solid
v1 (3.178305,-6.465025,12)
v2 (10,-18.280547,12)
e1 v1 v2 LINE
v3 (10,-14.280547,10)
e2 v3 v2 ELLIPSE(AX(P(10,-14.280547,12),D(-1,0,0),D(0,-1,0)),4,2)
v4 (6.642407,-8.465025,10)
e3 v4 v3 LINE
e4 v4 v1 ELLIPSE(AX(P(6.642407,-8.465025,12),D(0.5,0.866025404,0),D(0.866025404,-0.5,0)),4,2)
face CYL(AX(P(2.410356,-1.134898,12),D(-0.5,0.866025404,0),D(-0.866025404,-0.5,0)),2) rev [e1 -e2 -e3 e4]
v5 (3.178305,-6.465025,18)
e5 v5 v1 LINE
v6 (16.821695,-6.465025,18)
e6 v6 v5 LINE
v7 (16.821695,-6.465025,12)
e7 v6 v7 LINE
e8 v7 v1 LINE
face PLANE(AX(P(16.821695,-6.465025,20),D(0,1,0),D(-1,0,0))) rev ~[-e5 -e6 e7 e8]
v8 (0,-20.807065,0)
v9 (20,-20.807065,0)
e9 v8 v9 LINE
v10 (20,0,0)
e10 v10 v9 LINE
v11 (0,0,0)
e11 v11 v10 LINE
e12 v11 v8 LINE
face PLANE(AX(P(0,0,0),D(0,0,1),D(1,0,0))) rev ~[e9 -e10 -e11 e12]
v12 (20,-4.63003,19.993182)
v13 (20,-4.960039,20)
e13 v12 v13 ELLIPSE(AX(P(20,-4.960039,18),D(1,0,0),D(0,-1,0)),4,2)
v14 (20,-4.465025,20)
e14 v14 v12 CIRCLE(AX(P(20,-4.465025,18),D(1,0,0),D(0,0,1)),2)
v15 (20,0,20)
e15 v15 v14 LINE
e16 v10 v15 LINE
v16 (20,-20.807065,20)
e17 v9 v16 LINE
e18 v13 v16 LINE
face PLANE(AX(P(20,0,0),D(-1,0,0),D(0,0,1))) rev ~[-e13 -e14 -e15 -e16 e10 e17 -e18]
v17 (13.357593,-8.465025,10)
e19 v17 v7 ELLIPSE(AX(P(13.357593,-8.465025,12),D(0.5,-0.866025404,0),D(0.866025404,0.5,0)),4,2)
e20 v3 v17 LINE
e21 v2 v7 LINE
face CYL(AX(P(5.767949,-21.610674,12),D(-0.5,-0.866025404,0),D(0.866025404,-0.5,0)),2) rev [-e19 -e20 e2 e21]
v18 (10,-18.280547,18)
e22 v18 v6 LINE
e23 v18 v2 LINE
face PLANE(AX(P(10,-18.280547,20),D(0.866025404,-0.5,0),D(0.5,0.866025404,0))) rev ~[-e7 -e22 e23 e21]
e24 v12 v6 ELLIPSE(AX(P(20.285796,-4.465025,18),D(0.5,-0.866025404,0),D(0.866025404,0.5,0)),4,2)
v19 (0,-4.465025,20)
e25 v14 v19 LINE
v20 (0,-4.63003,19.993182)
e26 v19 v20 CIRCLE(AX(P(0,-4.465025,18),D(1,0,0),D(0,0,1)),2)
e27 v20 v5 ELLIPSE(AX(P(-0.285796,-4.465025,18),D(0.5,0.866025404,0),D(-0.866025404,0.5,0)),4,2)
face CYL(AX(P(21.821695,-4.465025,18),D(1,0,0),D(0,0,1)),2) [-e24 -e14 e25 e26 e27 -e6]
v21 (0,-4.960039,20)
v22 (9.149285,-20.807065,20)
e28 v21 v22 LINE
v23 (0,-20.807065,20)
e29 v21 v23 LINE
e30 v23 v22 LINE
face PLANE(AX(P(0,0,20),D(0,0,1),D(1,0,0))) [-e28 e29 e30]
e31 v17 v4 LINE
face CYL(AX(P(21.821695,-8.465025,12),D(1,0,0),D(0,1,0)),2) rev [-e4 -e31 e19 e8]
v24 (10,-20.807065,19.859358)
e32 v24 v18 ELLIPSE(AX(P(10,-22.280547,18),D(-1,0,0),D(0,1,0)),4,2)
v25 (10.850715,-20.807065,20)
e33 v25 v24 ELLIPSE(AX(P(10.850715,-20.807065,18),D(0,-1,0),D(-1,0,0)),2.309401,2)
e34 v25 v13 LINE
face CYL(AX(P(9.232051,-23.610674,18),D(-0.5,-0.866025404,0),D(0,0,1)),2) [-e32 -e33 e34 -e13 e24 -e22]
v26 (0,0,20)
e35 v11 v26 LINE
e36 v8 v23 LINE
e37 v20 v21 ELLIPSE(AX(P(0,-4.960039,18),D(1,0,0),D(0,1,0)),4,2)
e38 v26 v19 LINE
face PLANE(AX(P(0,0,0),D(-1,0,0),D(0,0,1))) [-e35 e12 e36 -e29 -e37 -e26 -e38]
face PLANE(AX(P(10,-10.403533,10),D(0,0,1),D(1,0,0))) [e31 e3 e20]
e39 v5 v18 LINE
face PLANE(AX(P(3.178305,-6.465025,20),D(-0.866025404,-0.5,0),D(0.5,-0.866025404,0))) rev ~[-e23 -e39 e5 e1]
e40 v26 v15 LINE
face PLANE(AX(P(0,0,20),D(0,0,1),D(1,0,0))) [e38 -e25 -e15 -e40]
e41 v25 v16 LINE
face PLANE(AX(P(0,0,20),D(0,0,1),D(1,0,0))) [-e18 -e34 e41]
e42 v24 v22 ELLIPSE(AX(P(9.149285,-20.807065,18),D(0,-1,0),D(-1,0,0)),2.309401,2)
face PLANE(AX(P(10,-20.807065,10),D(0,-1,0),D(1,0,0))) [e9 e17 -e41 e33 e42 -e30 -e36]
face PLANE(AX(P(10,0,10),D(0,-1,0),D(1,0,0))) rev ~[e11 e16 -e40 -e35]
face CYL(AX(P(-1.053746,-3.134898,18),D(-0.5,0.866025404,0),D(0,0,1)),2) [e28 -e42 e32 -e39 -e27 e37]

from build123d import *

# Parameters (mm, degrees)
F0_W         = 20
F0_H         = 20
F1_DEPTH     = 20.8070650697
F3_DEPTH     = 10
F4_T4_DEPTH  = 23.6433897602
F4_T10_DEPTH = 23.6433897602
F4_T15_DEPTH = 23.6433897602
F4_T20_DEPTH = 23.6433897602
F4_T26_DEPTH = 23.6433897602
F4_T32_DEPTH = 23.6433897602
F4_T39_DEPTH = 23.6433897602
F4_T44_DEPTH = 23.6433897602
F4_T52_DEPTH = 23.6433897602
F4_T57_DEPTH = 23.6433897602
F4_T65_DEPTH = 23.6433897602
F4_T70_DEPTH = 23.6433897602


# Not quite as in the source:
# - a fillet or chamfer that OpenCascade refuses, or shapes differently, is made with other operations: its cross-section is extruded or revolved along the edge and cut away or added


with BuildPart() as f1:
    # F0 (on Front) → F1 (new body)
    with BuildSketch(Plane.XZ):
        with Locations((10, 10)):
            Rectangle(F0_W, F0_H)
    extrude(amount=F1_DEPTH)

    # F2 (on face) → F3 (cut)
    with BuildSketch(Plane.XY.offset(20)):
        Polygon((10, -18.2805472855), (16.8216948801, -6.4650251595), (3.1783051199, -6.4650251595), align=None)
    extrude(amount=-F3_DEPTH, mode=Mode.SUBTRACT)

    # F4: fillet of radius 2 on 6 edges, made by hand


with BuildPart() as f4_tool2:
    # F4_s3 → F4_t4 (new body)
    with BuildSketch(Plane.YZ.offset(21.8216948801)):
        with BuildLine():
            ThreePointArc((-6.4650251595, 12), (-7.0508115971, 10.5857864376), (-8.4650251595, 10))
            Line((-8.4650251595, 10), (-6.4650251595, 10))
            Line((-6.4650251595, 10), (-6.4650251595, 12))
        make_face()
    extrude(amount=-F4_T4_DEPTH)

    split(bisect_by=Plane(origin=(-0.4157091722, -0.2400098025, 0), x_dir=(0, 0, 1), z_dir=(0.8660254038, 0.5, 0)), keep=Keep.TOP)

    split(bisect_by=Plane(origin=(15.4157091722, -8.9002638403, 0), x_dir=(0, 0, 1), z_dir=(-0.8660254038, 0.5, 0)), keep=Keep.TOP)


with BuildPart() as f1_1:
    add(f1.part)

    # F4_t1: union F4_tool2
    add(f4_tool2.part)


with BuildPart() as f4_tool8:
    # F4_s9 → F4_t10 (new body)
    with BuildSketch(Plane(origin=(-7.9157091722, -13.7104104641, 0), x_dir=(0, 0, 1), z_dir=(0.5, 0.8660254038, 0))):
        with BuildLine():
            ThreePointArc((12, 17.8005276806), (10.5857864376, 17.214741243), (10, 15.8005276806))
            Line((10, 15.8005276806), (10, 17.8005276806))
            Line((10, 17.8005276806), (12, 17.8005276806))
        make_face()
    extrude(amount=F4_T10_DEPTH)

    split(bisect_by=Plane(origin=(-0.4157091722, -0.2400098025, 0), x_dir=(0, 0, 1), z_dir=(0.8660254038, 0.5, 0)), keep=Keep.TOP)


with BuildPart() as f1_2:
    add(f1_1.part)

    # F4_t7: union F4_tool8
    add(f4_tool8.part)


with BuildPart() as f4_tool13:
    # F4_s14 → F4_t15 (new body)
    with BuildSketch(Plane(origin=(1.0940142921, -1.8948883381, 0), x_dir=(0, 0, 1), z_dir=(0.5, -0.8660254038, 0))):
        with BuildLine():
            ThreePointArc((12, 0.4800196049), (10.5857864376, -0.1057668327), (10, -1.5199803951))
            Line((10, -1.5199803951), (10, 0.4800196049))
            Line((10, 0.4800196049), (12, 0.4800196049))
        make_face()
    extrude(amount=F4_T15_DEPTH)

    split(bisect_by=Plane(origin=(15.4157091722, -8.9002638403, 0), x_dir=(0, 0, 1), z_dir=(-0.8660254038, 0.5, 0)), keep=Keep.TOP)


with BuildPart() as f1_3:
    add(f1_2.part)

    # F4_t12: union F4_tool13
    add(f4_tool13.part)


with BuildPart() as f4_tool18:
    # F4_s19 → F4_t20 (new body)
    with BuildSketch(Plane(origin=(-7.9157091722, -13.7104104641, 0), x_dir=(0, 0, 1), z_dir=(0.5, 0.8660254038, 0))):
        with BuildLine():
            ThreePointArc((20, 19.8005276806), (19.4142135624, 18.3863141182), (18, 17.8005276806))
            Line((18, 17.8005276806), (20, 17.8005276806))
            Line((20, 17.8005276806), (20, 19.8005276806))
        make_face()
    extrude(amount=F4_T20_DEPTH)

    split(bisect_by=Plane(origin=(-0.4157091722, -0.2400098025, 0), x_dir=(0, 0, 1), z_dir=(0.8660254038, 0.5, 0)), keep=Keep.TOP)

    split(bisect_by=Plane.XZ.offset(6.4650251595), keep=Keep.TOP)


with BuildPart() as f1_4:
    add(f1_3.part)

    # F4_t17: cut F4_tool18
    add(f4_tool18.part, mode=Mode.SUBTRACT)


with BuildPart() as f4_tool24:
    # F4_s25 → F4_t26 (new body)
    with BuildSketch(Plane(origin=(1.0940142921, -1.8948883381, 0), x_dir=(0, 0, 1), z_dir=(0.5, -0.8660254038, 0))):
        with BuildLine():
            ThreePointArc((20, 2.4800196049), (19.4142135624, 1.0658060425), (18, 0.4800196049))
            Line((18, 0.4800196049), (20, 0.4800196049))
            Line((20, 0.4800196049), (20, 2.4800196049))
        make_face()
    extrude(amount=F4_T26_DEPTH)

    split(bisect_by=Plane.XZ.offset(6.4650251595), keep=Keep.TOP)

    split(bisect_by=Plane(origin=(15.4157091722, -8.9002638403, 0), x_dir=(0, 0, 1), z_dir=(-0.8660254038, 0.5, 0)), keep=Keep.TOP)


with BuildPart() as f1_5:
    add(f1_4.part)

    # F4_t23: cut F4_tool24
    add(f4_tool24.part, mode=Mode.SUBTRACT)


with BuildPart() as f4_tool30:
    # F4_s31 → F4_t32 (new body)
    with BuildSketch(Plane.YZ.offset(21.8216948801)):
        with BuildLine():
            ThreePointArc((-4.4650251595, 20), (-5.8792387219, 19.4142135624), (-6.4650251595, 18))
            Line((-6.4650251595, 18), (-6.4650251595, 20))
            Line((-6.4650251595, 20), (-4.4650251595, 20))
        make_face()
    extrude(amount=-F4_T32_DEPTH)

    split(bisect_by=Plane(origin=(-0.4157091722, -0.2400098025, 0), x_dir=(0, 0, 1), z_dir=(0.8660254038, 0.5, 0)), keep=Keep.TOP)

    split(bisect_by=Plane(origin=(15.4157091722, -8.9002638403, 0), x_dir=(0, 0, 1), z_dir=(-0.8660254038, 0.5, 0)), keep=Keep.TOP)


with BuildPart() as f1_6:
    add(f1_5.part)

    # F4_t29: cut F4_tool30
    add(f4_tool30.part, mode=Mode.SUBTRACT)


with BuildPart() as f4_tool37:
    # F4_s38 → F4_t39 (new body)
    with BuildSketch(Plane(origin=(1.0940142921, -1.8948883381, 0), x_dir=(0, 0, 1), z_dir=(0.5, -0.8660254038, 0))):
        with BuildLine():
            ThreePointArc((20, 2.4800196049), (19.4142135624, 1.0658060425), (18, 0.4800196049))
            Line((18, 0.4800196049), (20, 0.4800196049))
            Line((20, 0.4800196049), (20, 2.4800196049))
        make_face()
    extrude(amount=F4_T39_DEPTH)

    split(bisect_by=Plane.XZ.offset(20.8070650697), keep=Keep.BOTTOM)

    split(bisect_by=Plane(origin=(15.4157091722, -8.9002638403, 0), x_dir=(0, 0, 1), z_dir=(0.8660254038, -0.5, 0)), keep=Keep.TOP)


with BuildPart() as f4_tool42:
    # F4_s43 → F4_t44 (new body)
    with BuildSketch(Plane(origin=(-7.9157091722, -13.7104104641, 0), x_dir=(0, 0, 1), z_dir=(0.5, 0.8660254038, 0))):
        with BuildLine():
            ThreePointArc((20, 19.8005276806), (19.4142135624, 18.3863141182), (18, 17.8005276806))
            Line((18, 17.8005276806), (20, 17.8005276806))
            Line((20, 17.8005276806), (20, 19.8005276806))
        make_face()
    extrude(amount=F4_T44_DEPTH)

    split(bisect_by=Plane.XZ.offset(20.8070650697), keep=Keep.BOTTOM)

    split(bisect_by=Plane(origin=(-0.4157091722, -0.2400098025, 0), x_dir=(0, 0, 1), z_dir=(-0.8660254038, -0.5, 0)), keep=Keep.TOP)


with BuildPart() as f4_tool37_1:
    add(f4_tool37.part)

    # F4_t47: intersect F4_tool42
    add(f4_tool42.part, mode=Mode.INTERSECT)


with BuildPart() as f1_7:
    add(f1_6.part)

    # F4_t35: cut F4_tool37
    add(f4_tool37_1.part, mode=Mode.SUBTRACT)


with BuildPart() as f4_tool50:
    # F4_s51 → F4_t52 (new body)
    with BuildSketch(Plane.YZ.offset(21.8216948801)):
        with BuildLine():
            ThreePointArc((-4.4650251595, 20), (-5.8792387219, 19.4142135624), (-6.4650251595, 18))
            Line((-6.4650251595, 18), (-6.4650251595, 20))
            Line((-6.4650251595, 20), (-4.4650251595, 20))
        make_face()
    extrude(amount=-F4_T52_DEPTH)

    split(bisect_by=Plane.YZ.offset(20), keep=Keep.BOTTOM)

    split(bisect_by=Plane(origin=(15.4157091722, -8.9002638403, 0), x_dir=(0, 0, 1), z_dir=(0.8660254038, -0.5, 0)), keep=Keep.TOP)


with BuildPart() as f4_tool55:
    # F4_s56 → F4_t57 (new body)
    with BuildSketch(Plane(origin=(-7.9157091722, -13.7104104641, 0), x_dir=(0, 0, 1), z_dir=(0.5, 0.8660254038, 0))):
        with BuildLine():
            ThreePointArc((20, 19.8005276806), (19.4142135624, 18.3863141182), (18, 17.8005276806))
            Line((18, 17.8005276806), (20, 17.8005276806))
            Line((20, 17.8005276806), (20, 19.8005276806))
        make_face()
    extrude(amount=F4_T57_DEPTH)

    split(bisect_by=Plane.YZ.offset(20), keep=Keep.BOTTOM)

    split(bisect_by=Plane.XZ.offset(6.4650251595), keep=Keep.BOTTOM)


with BuildPart() as f4_tool50_1:
    add(f4_tool50.part)

    # F4_t60: intersect F4_tool55
    add(f4_tool55.part, mode=Mode.INTERSECT)


with BuildPart() as f1_8:
    add(f1_7.part)

    # F4_t48: cut F4_tool50
    add(f4_tool50_1.part, mode=Mode.SUBTRACT)


with BuildPart() as f4_tool63:
    # F4_s64 → F4_t65 (new body)
    with BuildSketch(Plane(origin=(1.0940142921, -1.8948883381, 0), x_dir=(0, 0, 1), z_dir=(0.5, -0.8660254038, 0))):
        with BuildLine():
            ThreePointArc((20, 2.4800196049), (19.4142135624, 1.0658060425), (18, 0.4800196049))
            Line((18, 0.4800196049), (20, 0.4800196049))
            Line((20, 0.4800196049), (20, 2.4800196049))
        make_face()
    extrude(amount=F4_T65_DEPTH)

    split(bisect_by=Plane.YZ, keep=Keep.TOP)

    split(bisect_by=Plane.XZ.offset(6.4650251595), keep=Keep.BOTTOM)


with BuildPart() as f4_tool68:
    # F4_s69 → F4_t70 (new body)
    with BuildSketch(Plane.YZ.offset(21.8216948801)):
        with BuildLine():
            ThreePointArc((-4.4650251595, 20), (-5.8792387219, 19.4142135624), (-6.4650251595, 18))
            Line((-6.4650251595, 18), (-6.4650251595, 20))
            Line((-6.4650251595, 20), (-4.4650251595, 20))
        make_face()
    extrude(amount=-F4_T70_DEPTH)

    split(bisect_by=Plane.YZ, keep=Keep.TOP)

    split(bisect_by=Plane(origin=(-0.4157091722, -0.2400098025, 0), x_dir=(0, 0, 1), z_dir=(-0.8660254038, -0.5, 0)), keep=Keep.TOP)


with BuildPart() as f4_tool63_1:
    add(f4_tool63.part)

    # F4_t73: intersect F4_tool68
    add(f4_tool68.part, mode=Mode.INTERSECT)


with BuildPart() as f1_9:
    add(f1_8.part)

    # F4_t61: cut F4_tool63
    add(f4_tool63_1.part, mode=Mode.SUBTRACT)


solid = f1_9.part
